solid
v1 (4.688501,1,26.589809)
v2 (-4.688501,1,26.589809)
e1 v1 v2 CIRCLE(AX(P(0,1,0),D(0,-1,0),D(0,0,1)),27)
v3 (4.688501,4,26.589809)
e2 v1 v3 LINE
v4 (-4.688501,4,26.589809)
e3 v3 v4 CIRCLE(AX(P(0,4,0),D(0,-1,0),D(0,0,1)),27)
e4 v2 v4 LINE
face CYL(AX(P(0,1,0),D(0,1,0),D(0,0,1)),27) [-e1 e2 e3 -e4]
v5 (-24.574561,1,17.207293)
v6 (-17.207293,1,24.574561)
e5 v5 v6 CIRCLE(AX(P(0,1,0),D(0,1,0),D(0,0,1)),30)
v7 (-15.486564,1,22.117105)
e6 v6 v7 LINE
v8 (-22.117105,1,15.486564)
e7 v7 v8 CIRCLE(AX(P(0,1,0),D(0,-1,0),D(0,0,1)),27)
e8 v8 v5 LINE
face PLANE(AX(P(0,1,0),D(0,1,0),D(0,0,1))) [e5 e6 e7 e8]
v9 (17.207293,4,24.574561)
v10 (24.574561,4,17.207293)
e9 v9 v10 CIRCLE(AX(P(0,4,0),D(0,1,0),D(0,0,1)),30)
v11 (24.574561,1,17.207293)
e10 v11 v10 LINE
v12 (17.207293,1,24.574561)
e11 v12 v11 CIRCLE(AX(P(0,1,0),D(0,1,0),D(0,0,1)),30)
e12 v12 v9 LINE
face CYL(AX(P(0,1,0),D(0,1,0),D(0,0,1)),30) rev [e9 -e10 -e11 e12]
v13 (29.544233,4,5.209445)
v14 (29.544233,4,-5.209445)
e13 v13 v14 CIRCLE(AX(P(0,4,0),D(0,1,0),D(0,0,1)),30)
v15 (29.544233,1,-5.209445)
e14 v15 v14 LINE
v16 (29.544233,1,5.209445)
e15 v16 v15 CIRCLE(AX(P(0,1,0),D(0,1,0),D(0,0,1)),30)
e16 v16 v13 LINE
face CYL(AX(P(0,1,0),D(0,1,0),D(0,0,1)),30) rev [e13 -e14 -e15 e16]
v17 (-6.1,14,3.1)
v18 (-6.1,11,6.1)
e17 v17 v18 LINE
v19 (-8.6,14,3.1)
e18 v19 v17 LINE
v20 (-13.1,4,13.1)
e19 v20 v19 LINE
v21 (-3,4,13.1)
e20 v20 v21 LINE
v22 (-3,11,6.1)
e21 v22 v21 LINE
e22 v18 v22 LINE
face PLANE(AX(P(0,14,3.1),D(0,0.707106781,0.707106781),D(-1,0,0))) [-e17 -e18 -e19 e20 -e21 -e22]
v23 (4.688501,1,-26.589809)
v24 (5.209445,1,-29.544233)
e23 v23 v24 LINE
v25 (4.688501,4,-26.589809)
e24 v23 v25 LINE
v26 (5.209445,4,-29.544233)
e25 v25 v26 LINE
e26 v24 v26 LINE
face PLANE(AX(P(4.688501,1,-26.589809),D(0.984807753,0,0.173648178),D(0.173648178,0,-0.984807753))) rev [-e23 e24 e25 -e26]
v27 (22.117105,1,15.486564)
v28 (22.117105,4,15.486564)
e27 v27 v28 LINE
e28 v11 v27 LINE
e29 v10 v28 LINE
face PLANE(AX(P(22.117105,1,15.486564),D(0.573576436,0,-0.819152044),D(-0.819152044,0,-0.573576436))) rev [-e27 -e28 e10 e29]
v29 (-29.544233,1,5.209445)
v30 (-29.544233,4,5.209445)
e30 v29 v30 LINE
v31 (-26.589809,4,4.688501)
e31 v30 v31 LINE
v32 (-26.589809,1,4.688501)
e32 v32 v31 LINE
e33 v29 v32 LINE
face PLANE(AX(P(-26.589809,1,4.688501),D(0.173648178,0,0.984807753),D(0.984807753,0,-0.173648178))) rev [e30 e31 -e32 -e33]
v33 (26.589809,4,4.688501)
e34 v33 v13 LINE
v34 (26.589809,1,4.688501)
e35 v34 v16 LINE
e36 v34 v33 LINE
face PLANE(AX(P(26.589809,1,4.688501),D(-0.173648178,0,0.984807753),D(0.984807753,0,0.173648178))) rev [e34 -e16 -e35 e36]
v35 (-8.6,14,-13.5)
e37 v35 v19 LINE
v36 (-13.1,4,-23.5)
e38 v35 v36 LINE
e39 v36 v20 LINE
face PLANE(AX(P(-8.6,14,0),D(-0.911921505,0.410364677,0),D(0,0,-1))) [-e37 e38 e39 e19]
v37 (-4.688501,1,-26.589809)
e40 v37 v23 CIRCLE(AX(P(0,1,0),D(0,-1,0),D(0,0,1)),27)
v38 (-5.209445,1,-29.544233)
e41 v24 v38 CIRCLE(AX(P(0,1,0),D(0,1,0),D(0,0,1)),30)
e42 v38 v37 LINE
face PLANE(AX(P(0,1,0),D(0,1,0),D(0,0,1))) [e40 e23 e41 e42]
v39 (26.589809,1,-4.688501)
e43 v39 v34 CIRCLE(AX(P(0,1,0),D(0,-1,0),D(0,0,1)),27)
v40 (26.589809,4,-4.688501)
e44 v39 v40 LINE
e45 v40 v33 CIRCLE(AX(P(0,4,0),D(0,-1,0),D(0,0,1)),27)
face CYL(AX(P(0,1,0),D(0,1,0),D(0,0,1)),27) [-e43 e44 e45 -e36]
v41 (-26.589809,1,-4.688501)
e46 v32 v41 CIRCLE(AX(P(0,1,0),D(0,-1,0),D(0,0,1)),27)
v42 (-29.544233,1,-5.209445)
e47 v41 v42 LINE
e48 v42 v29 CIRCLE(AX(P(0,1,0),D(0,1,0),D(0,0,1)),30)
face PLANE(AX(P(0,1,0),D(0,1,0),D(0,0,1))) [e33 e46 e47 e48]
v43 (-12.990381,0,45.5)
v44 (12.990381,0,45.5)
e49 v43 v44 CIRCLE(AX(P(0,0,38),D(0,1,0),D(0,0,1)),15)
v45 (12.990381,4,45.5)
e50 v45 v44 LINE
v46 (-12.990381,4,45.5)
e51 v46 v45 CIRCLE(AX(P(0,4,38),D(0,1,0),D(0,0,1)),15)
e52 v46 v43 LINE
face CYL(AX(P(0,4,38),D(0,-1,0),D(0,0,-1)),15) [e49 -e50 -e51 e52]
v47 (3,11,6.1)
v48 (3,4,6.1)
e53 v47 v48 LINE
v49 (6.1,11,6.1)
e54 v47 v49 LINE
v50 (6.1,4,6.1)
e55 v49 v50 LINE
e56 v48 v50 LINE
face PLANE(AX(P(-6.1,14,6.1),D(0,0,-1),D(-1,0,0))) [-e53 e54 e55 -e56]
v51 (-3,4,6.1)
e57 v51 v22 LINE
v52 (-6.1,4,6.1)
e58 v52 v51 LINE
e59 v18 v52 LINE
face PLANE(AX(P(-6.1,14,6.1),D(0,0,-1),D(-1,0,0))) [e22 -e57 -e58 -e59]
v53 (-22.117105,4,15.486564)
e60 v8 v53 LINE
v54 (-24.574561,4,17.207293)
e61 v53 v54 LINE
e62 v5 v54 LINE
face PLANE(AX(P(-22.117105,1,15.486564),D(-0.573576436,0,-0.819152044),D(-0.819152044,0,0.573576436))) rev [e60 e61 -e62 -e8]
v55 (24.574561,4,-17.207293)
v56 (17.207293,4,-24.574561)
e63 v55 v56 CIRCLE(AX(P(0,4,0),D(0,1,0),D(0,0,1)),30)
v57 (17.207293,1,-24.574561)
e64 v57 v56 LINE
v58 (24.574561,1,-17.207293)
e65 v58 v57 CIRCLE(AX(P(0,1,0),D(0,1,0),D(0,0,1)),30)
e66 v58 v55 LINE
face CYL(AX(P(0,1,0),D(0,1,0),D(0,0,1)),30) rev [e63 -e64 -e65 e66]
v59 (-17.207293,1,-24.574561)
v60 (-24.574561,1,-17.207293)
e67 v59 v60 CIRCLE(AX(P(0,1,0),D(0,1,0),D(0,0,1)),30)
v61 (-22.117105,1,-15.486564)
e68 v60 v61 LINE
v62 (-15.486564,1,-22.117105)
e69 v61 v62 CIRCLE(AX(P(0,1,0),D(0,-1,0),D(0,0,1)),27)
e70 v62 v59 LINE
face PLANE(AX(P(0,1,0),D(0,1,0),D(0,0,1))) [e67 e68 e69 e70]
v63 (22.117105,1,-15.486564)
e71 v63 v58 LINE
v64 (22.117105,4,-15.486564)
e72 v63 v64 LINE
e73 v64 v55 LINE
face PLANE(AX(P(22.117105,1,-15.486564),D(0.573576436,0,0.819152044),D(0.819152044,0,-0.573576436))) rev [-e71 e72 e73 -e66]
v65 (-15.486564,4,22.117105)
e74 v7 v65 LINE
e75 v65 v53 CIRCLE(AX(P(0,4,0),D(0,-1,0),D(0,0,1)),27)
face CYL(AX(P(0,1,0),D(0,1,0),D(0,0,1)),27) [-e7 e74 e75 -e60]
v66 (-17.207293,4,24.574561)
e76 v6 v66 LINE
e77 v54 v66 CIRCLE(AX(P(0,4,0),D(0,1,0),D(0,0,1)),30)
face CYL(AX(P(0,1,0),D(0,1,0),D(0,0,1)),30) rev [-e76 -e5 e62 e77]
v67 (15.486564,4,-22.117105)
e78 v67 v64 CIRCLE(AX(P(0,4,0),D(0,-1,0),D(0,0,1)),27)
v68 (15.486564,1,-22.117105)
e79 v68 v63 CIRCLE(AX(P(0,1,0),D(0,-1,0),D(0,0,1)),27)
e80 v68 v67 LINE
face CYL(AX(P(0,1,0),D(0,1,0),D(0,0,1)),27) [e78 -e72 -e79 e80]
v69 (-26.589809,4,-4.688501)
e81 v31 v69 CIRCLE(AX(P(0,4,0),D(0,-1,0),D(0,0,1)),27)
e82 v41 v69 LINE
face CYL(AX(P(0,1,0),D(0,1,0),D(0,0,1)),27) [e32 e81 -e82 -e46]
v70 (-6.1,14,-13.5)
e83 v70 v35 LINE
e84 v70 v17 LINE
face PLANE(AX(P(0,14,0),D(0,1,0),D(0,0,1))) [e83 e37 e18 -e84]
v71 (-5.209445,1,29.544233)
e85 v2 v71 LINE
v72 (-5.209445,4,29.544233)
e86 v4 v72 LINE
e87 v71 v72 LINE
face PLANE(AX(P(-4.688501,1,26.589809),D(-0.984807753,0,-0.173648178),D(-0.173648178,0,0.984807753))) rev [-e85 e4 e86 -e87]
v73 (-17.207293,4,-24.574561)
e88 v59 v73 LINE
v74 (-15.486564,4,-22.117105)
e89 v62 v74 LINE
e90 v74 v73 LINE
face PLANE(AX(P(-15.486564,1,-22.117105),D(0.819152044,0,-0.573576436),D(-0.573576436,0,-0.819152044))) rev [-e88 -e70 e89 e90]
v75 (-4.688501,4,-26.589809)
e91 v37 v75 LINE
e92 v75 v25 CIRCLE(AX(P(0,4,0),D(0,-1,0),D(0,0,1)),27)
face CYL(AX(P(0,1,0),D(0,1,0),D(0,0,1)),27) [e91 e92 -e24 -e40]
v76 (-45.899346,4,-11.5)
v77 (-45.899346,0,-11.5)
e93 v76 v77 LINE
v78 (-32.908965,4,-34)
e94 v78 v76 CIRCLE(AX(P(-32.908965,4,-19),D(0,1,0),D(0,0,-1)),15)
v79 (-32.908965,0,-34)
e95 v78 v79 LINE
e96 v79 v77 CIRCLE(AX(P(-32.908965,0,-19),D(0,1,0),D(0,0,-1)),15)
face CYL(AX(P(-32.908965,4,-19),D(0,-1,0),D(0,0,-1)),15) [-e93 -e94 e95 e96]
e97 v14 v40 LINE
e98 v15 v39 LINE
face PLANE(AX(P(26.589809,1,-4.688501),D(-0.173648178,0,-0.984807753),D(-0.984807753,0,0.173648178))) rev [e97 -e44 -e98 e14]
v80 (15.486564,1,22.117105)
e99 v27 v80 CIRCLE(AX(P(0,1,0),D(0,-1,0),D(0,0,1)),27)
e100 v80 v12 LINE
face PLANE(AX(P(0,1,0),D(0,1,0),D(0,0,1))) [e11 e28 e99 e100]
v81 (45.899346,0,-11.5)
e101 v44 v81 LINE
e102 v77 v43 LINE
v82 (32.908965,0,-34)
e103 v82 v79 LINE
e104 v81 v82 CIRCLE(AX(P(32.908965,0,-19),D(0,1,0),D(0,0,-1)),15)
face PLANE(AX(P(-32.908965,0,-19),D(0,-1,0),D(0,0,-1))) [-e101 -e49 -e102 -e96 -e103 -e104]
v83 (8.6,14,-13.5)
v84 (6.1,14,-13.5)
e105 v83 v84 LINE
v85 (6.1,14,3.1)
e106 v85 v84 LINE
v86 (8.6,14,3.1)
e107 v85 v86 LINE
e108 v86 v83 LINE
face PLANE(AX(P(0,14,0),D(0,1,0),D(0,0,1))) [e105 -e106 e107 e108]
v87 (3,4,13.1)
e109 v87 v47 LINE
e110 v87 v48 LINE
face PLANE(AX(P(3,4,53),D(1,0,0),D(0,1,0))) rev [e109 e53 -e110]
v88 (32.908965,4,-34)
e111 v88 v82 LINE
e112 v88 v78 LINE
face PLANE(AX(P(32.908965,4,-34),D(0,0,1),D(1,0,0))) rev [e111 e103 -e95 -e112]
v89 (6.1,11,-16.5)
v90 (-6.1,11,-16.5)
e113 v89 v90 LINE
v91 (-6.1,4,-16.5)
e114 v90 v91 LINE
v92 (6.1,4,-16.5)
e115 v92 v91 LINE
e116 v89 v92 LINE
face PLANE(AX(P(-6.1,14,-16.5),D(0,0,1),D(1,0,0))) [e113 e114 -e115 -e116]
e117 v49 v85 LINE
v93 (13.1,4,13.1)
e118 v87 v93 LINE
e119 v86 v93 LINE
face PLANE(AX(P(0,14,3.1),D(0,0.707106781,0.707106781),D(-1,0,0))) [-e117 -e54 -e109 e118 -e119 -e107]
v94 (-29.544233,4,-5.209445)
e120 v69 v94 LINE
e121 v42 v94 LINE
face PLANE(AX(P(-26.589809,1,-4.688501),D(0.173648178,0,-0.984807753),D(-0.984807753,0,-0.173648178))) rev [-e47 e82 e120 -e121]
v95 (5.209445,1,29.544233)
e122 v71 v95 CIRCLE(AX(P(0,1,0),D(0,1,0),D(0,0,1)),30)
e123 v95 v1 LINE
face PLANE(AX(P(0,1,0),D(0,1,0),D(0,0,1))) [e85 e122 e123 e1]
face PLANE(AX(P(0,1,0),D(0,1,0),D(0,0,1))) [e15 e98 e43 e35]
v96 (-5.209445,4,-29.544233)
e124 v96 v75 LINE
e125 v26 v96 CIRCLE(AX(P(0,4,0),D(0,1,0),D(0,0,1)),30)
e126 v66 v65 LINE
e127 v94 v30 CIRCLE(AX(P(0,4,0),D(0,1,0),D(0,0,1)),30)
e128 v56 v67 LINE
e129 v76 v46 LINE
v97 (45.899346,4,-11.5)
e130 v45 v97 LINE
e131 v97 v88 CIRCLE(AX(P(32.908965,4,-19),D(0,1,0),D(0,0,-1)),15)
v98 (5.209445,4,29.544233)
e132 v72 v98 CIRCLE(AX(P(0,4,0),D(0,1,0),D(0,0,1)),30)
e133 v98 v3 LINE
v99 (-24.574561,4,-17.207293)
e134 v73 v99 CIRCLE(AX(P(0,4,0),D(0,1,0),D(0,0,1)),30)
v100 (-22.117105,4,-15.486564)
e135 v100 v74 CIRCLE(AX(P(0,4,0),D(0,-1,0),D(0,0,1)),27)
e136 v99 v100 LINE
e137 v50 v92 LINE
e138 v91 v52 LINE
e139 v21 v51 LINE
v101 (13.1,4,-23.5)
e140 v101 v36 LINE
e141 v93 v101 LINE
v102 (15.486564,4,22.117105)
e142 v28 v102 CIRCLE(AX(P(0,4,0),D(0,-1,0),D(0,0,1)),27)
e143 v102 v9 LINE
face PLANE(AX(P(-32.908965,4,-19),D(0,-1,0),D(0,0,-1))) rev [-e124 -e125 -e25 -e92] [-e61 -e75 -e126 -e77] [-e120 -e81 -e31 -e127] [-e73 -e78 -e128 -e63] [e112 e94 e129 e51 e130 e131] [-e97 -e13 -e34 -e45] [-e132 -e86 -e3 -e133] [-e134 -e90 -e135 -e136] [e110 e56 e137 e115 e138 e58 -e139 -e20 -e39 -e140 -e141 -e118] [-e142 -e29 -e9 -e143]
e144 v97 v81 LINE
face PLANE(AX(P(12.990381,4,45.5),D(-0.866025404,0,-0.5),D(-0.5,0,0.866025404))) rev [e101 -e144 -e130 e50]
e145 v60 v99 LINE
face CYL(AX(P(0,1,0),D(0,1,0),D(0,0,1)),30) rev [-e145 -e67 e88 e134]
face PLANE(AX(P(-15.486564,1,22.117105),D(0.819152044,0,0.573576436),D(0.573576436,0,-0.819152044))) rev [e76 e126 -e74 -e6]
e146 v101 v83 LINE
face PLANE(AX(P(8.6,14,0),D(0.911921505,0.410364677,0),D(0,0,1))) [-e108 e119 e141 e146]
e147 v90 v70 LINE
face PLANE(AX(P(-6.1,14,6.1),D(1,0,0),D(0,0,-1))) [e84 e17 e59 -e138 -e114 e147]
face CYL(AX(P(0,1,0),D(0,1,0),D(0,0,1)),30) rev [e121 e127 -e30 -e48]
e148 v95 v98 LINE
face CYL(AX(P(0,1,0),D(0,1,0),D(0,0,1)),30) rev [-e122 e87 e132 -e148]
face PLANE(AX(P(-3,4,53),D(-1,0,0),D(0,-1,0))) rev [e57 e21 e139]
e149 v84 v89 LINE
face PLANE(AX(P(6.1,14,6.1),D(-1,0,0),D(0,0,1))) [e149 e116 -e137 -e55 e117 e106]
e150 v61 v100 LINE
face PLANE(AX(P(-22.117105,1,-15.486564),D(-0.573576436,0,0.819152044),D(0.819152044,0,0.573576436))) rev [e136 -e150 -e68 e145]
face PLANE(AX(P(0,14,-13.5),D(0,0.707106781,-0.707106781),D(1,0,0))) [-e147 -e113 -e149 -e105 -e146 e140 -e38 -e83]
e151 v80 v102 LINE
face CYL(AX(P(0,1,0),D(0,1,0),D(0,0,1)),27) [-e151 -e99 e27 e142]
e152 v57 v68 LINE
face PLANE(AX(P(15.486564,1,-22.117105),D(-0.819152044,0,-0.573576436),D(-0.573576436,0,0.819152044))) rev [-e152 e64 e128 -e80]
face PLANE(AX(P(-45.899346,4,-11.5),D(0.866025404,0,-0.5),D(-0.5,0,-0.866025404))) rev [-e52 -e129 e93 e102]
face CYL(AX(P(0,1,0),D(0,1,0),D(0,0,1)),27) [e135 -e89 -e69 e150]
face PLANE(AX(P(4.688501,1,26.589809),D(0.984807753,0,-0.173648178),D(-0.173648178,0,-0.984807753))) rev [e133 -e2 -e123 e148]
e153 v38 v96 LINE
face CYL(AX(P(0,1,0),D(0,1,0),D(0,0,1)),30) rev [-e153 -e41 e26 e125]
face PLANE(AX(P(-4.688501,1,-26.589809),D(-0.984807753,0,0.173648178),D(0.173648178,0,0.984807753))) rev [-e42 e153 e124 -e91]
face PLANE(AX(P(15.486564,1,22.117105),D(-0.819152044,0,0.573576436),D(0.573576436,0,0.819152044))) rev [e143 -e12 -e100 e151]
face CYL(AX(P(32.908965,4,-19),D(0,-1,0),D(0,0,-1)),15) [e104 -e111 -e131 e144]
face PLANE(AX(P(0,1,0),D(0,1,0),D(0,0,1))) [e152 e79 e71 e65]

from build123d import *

# Parameters (mm, degrees)
BOSS_EXTRUDE1_DEPTH = 4
CUT_EXTRUDE1_DEPTH  = 3
SKETCH3_W           = 26.2
SKETCH3_H           = 36.6
SKETCH3_W_2         = 12.2
SKETCH3_H_2         = 22.6
BOSS_EXTRUDE8_DEPTH = 10
CHAMFER3_SIZE2      = 4.5
CHAMFER3_SIZE       = 10
CHAMFER4_SIZE2      = 10
CHAMFER4_SIZE       = 4.5
CHAMFER5_SIZE       = 10
CHAMFER6_SIZE       = 10
SKETCH4_W           = 6
SKETCH4_H           = 7
CUT_EXTRUDE2_DEPTH  = 69.48999168


# Some blends are built 0.0001 mm under size
with BuildPart() as part:
    # Sketch1 → Boss-Extrude1 (new body)
    with BuildSketch(Plane(origin=(0, 0, 0), x_dir=(1, 0, 0), z_dir=(0, 1, 0))):
        with BuildLine():
            Line((32.908965344, 34), (-32.908965344, 34))
            ThreePointArc((-32.908965344, 34), (-45.899346401, 26.5), (-45.899346401, 11.5))
            Line((-45.899346401, 11.5), (-12.990381057, -45.5))
            ThreePointArc((-12.990381057, -45.5), (0, -53), (12.990381057, -45.5))
            Line((12.990381057, -45.5), (45.899346401, 11.5))
            ThreePointArc((45.899346401, 11.5), (45.899346401, 26.5), (32.908965344, 34))
        make_face()
    extrude(amount=BOSS_EXTRUDE1_DEPTH)

    # Sketch2 → Cut-Extrude1 (cut)
    with BuildSketch(Plane(origin=(0, 4, 0), x_dir=(1, 0, 0), z_dir=(0, 1, 0))):
        with BuildLine():
            Line((4.688500797, 26.589809331), (5.20944533, 29.54423259))
            ThreePointArc((5.20944533, 29.54423259), (0, 30), (-5.20944533, 29.54423259))
            Line((-5.20944533, 29.54423259), (-4.688500797, 26.589809331))
            ThreePointArc((-4.688500797, 26.589809331), (0, 27), (4.688500797, 26.589809331))
        make_face()
        with BuildLine():
            Line((15.486563781, 22.117105196), (17.207293091, 24.574561329))
            ThreePointArc((17.207293091, 24.574561329), (21.213203436, 21.213203436), (24.574561329, 17.207293091))
            Line((24.574561329, 17.207293091), (22.117105196, 15.486563781))
            ThreePointArc((22.117105196, 15.486563781), (19.091883092, 19.091883092), (15.486563781, 22.117105196))
        make_face()
        with BuildLine():
            Line((26.589809331, 4.688500797), (29.54423259, 5.20944533))
            ThreePointArc((29.54423259, 5.20944533), (30, 0), (29.54423259, -5.20944533))
            Line((29.54423259, -5.20944533), (26.589809331, -4.688500797))
            ThreePointArc((26.589809331, -4.688500797), (27, 0), (26.589809331, 4.688500797))
        make_face()
        with BuildLine():
            Line((22.117105196, -15.486563781), (24.574561329, -17.207293091))
            ThreePointArc((24.574561329, -17.207293091), (21.213203436, -21.213203436), (17.207293091, -24.574561329))
            Line((17.207293091, -24.574561329), (15.486563781, -22.117105196))
            ThreePointArc((15.486563781, -22.117105196), (19.091883092, -19.091883092), (22.117105196, -15.486563781))
        make_face()
        with BuildLine():
            Line((4.688500797, -26.589809331), (5.20944533, -29.54423259))
            ThreePointArc((5.20944533, -29.54423259), (0, -30), (-5.20944533, -29.54423259))
            Line((-5.20944533, -29.54423259), (-4.688500797, -26.589809331))
            ThreePointArc((-4.688500797, -26.589809331), (0, -27), (4.688500797, -26.589809331))
        make_face()
        with BuildLine():
            Line((-15.486563781, -22.117105196), (-17.207293091, -24.574561329))
            ThreePointArc((-17.207293091, -24.574561329), (-21.213203436, -21.213203436), (-24.574561329, -17.207293091))
            Line((-24.574561329, -17.207293091), (-22.117105196, -15.486563781))
            ThreePointArc((-22.117105196, -15.486563781), (-19.091883092, -19.091883092), (-15.486563781, -22.117105196))
        make_face()
        with BuildLine():
            Line((-26.589809331, -4.688500797), (-29.54423259, -5.20944533))
            ThreePointArc((-29.54423259, -5.20944533), (-30, 0), (-29.54423259, 5.20944533))
            Line((-29.54423259, 5.20944533), (-26.589809331, 4.688500797))
            ThreePointArc((-26.589809331, 4.688500797), (-27, 0), (-26.589809331, -4.688500797))
        make_face()
        with BuildLine():
            Line((-22.117105196, 15.486563781), (-24.574561329, 17.207293091))
            ThreePointArc((-24.574561329, 17.207293091), (-21.213203436, 21.213203436), (-17.207293091, 24.574561329))
            Line((-17.207293091, 24.574561329), (-15.486563781, 22.117105196))
            ThreePointArc((-15.486563781, 22.117105196), (-19.091883092, 19.091883092), (-22.117105196, 15.486563781))
        make_face()
    extrude(amount=-CUT_EXTRUDE1_DEPTH, mode=Mode.SUBTRACT)

    # Sketch3 → Boss-Extrude8 (add)
    with BuildSketch(Plane(origin=(0, 4, 0), x_dir=(1, 0, 0), z_dir=(0, 1, 0))):
        with Locations((0, 5.2)):
            Rectangle(SKETCH3_W, SKETCH3_H)
        with Locations((0, 5.2)):
            Rectangle(SKETCH3_W_2, SKETCH3_H_2, mode=Mode.SUBTRACT)
    extrude(amount=BOSS_EXTRUDE8_DEPTH)

    # Chamfer3
    chamfer3_edges = [part.edges().sort_by_distance(p)[0] for p in [
        (-13.1, 14, -5.2),
    ]]
    chamfer3_side = [part.faces().sort_by_distance(p)[0] for p in [
        (-13.1, 13.91, -5.2),
    ]]
    chamfer(chamfer3_edges, length=CHAMFER3_SIZE - 0.0001, length2=CHAMFER3_SIZE2 - 0.0001, reference=chamfer3_side[0])  # a hair under: the kernel refuses the full size

    # Chamfer4
    chamfer4_edges = [part.edges().sort_by_distance(p)[0] for p in [
        (13.1, 14, -5.2),
    ]]
    chamfer4_side = [part.faces().sort_by_distance(p)[0] for p in [
        (13.01, 14, -5.2),
    ]]
    chamfer(chamfer4_edges, length=CHAMFER4_SIZE - 0.0001, length2=CHAMFER4_SIZE2 - 0.0001, reference=chamfer4_side[0])  # a hair under: the kernel refuses the full size

    # Chamfer5
    # the kernel refuses this chamfer: 10 mm, written as the material it takes off along each edge
    with BuildSketch(Plane(origin=(-34.31692988, 14, -23.5), x_dir=(0, 0.027495876610586317, 0.9996219169112968), z_dir=(1, 0, 0))) as chamfer5_piece_1_section:
        Polygon((CHAMFER5_SIZE * 0.999621916911, CHAMFER5_SIZE * 0.0274958766106), (-CHAMFER5_SIZE * 0.0274958766106, CHAMFER5_SIZE * 0.999621916911), (0, 0), align=None)
    chamfer5_piece_1 = extrude(amount=68.633859759, mode=Mode.PRIVATE)
    chamfer5_piece_1 = split(chamfer5_piece_1, bisect_by=Plane(origin=(0, 4, -20.195958457), z_dir=(0, 1, 0)), keep=Keep.TOP, mode=Mode.PRIVATE)
    add(chamfer5_piece_1, mode=Mode.SUBTRACT)

    # Chamfer6
    # the kernel refuses this chamfer: 10 mm, written as the material it takes off along each edge
    with BuildSketch(Plane(origin=(34.31692988, 14, 13.1), x_dir=(0, -0.9996219169112968, 0.027495876610586317), z_dir=(-1, 0, 0))) as chamfer6_piece_1_section:
        Polygon((CHAMFER6_SIZE * 0.999621916911, -CHAMFER6_SIZE * 0.0274958766106), (-CHAMFER6_SIZE * 0.0274958766106, -CHAMFER6_SIZE * 0.999621916911), (0, 0), align=None)
    chamfer6_piece_1 = extrude(amount=68.633859759, mode=Mode.PRIVATE)
    chamfer6_piece_1 = split(chamfer6_piece_1, bisect_by=Plane(origin=(0, 4, 9.795958457), z_dir=(0, 1, 0)), keep=Keep.TOP, mode=Mode.PRIVATE)
    add(chamfer6_piece_1, mode=Mode.SUBTRACT)

    # Sketch4 → Cut-Extrude2 (cut, through all)
    with BuildSketch(Plane(origin=(0, 0, 6.1), x_dir=(-1, 0, 0), z_dir=(0, 0, -1))):
        with Locations((0, 7.5)):
            Rectangle(SKETCH4_W, SKETCH4_H)
    extrude(amount=-CUT_EXTRUDE2_DEPTH, mode=Mode.SUBTRACT)


solid = part.part
